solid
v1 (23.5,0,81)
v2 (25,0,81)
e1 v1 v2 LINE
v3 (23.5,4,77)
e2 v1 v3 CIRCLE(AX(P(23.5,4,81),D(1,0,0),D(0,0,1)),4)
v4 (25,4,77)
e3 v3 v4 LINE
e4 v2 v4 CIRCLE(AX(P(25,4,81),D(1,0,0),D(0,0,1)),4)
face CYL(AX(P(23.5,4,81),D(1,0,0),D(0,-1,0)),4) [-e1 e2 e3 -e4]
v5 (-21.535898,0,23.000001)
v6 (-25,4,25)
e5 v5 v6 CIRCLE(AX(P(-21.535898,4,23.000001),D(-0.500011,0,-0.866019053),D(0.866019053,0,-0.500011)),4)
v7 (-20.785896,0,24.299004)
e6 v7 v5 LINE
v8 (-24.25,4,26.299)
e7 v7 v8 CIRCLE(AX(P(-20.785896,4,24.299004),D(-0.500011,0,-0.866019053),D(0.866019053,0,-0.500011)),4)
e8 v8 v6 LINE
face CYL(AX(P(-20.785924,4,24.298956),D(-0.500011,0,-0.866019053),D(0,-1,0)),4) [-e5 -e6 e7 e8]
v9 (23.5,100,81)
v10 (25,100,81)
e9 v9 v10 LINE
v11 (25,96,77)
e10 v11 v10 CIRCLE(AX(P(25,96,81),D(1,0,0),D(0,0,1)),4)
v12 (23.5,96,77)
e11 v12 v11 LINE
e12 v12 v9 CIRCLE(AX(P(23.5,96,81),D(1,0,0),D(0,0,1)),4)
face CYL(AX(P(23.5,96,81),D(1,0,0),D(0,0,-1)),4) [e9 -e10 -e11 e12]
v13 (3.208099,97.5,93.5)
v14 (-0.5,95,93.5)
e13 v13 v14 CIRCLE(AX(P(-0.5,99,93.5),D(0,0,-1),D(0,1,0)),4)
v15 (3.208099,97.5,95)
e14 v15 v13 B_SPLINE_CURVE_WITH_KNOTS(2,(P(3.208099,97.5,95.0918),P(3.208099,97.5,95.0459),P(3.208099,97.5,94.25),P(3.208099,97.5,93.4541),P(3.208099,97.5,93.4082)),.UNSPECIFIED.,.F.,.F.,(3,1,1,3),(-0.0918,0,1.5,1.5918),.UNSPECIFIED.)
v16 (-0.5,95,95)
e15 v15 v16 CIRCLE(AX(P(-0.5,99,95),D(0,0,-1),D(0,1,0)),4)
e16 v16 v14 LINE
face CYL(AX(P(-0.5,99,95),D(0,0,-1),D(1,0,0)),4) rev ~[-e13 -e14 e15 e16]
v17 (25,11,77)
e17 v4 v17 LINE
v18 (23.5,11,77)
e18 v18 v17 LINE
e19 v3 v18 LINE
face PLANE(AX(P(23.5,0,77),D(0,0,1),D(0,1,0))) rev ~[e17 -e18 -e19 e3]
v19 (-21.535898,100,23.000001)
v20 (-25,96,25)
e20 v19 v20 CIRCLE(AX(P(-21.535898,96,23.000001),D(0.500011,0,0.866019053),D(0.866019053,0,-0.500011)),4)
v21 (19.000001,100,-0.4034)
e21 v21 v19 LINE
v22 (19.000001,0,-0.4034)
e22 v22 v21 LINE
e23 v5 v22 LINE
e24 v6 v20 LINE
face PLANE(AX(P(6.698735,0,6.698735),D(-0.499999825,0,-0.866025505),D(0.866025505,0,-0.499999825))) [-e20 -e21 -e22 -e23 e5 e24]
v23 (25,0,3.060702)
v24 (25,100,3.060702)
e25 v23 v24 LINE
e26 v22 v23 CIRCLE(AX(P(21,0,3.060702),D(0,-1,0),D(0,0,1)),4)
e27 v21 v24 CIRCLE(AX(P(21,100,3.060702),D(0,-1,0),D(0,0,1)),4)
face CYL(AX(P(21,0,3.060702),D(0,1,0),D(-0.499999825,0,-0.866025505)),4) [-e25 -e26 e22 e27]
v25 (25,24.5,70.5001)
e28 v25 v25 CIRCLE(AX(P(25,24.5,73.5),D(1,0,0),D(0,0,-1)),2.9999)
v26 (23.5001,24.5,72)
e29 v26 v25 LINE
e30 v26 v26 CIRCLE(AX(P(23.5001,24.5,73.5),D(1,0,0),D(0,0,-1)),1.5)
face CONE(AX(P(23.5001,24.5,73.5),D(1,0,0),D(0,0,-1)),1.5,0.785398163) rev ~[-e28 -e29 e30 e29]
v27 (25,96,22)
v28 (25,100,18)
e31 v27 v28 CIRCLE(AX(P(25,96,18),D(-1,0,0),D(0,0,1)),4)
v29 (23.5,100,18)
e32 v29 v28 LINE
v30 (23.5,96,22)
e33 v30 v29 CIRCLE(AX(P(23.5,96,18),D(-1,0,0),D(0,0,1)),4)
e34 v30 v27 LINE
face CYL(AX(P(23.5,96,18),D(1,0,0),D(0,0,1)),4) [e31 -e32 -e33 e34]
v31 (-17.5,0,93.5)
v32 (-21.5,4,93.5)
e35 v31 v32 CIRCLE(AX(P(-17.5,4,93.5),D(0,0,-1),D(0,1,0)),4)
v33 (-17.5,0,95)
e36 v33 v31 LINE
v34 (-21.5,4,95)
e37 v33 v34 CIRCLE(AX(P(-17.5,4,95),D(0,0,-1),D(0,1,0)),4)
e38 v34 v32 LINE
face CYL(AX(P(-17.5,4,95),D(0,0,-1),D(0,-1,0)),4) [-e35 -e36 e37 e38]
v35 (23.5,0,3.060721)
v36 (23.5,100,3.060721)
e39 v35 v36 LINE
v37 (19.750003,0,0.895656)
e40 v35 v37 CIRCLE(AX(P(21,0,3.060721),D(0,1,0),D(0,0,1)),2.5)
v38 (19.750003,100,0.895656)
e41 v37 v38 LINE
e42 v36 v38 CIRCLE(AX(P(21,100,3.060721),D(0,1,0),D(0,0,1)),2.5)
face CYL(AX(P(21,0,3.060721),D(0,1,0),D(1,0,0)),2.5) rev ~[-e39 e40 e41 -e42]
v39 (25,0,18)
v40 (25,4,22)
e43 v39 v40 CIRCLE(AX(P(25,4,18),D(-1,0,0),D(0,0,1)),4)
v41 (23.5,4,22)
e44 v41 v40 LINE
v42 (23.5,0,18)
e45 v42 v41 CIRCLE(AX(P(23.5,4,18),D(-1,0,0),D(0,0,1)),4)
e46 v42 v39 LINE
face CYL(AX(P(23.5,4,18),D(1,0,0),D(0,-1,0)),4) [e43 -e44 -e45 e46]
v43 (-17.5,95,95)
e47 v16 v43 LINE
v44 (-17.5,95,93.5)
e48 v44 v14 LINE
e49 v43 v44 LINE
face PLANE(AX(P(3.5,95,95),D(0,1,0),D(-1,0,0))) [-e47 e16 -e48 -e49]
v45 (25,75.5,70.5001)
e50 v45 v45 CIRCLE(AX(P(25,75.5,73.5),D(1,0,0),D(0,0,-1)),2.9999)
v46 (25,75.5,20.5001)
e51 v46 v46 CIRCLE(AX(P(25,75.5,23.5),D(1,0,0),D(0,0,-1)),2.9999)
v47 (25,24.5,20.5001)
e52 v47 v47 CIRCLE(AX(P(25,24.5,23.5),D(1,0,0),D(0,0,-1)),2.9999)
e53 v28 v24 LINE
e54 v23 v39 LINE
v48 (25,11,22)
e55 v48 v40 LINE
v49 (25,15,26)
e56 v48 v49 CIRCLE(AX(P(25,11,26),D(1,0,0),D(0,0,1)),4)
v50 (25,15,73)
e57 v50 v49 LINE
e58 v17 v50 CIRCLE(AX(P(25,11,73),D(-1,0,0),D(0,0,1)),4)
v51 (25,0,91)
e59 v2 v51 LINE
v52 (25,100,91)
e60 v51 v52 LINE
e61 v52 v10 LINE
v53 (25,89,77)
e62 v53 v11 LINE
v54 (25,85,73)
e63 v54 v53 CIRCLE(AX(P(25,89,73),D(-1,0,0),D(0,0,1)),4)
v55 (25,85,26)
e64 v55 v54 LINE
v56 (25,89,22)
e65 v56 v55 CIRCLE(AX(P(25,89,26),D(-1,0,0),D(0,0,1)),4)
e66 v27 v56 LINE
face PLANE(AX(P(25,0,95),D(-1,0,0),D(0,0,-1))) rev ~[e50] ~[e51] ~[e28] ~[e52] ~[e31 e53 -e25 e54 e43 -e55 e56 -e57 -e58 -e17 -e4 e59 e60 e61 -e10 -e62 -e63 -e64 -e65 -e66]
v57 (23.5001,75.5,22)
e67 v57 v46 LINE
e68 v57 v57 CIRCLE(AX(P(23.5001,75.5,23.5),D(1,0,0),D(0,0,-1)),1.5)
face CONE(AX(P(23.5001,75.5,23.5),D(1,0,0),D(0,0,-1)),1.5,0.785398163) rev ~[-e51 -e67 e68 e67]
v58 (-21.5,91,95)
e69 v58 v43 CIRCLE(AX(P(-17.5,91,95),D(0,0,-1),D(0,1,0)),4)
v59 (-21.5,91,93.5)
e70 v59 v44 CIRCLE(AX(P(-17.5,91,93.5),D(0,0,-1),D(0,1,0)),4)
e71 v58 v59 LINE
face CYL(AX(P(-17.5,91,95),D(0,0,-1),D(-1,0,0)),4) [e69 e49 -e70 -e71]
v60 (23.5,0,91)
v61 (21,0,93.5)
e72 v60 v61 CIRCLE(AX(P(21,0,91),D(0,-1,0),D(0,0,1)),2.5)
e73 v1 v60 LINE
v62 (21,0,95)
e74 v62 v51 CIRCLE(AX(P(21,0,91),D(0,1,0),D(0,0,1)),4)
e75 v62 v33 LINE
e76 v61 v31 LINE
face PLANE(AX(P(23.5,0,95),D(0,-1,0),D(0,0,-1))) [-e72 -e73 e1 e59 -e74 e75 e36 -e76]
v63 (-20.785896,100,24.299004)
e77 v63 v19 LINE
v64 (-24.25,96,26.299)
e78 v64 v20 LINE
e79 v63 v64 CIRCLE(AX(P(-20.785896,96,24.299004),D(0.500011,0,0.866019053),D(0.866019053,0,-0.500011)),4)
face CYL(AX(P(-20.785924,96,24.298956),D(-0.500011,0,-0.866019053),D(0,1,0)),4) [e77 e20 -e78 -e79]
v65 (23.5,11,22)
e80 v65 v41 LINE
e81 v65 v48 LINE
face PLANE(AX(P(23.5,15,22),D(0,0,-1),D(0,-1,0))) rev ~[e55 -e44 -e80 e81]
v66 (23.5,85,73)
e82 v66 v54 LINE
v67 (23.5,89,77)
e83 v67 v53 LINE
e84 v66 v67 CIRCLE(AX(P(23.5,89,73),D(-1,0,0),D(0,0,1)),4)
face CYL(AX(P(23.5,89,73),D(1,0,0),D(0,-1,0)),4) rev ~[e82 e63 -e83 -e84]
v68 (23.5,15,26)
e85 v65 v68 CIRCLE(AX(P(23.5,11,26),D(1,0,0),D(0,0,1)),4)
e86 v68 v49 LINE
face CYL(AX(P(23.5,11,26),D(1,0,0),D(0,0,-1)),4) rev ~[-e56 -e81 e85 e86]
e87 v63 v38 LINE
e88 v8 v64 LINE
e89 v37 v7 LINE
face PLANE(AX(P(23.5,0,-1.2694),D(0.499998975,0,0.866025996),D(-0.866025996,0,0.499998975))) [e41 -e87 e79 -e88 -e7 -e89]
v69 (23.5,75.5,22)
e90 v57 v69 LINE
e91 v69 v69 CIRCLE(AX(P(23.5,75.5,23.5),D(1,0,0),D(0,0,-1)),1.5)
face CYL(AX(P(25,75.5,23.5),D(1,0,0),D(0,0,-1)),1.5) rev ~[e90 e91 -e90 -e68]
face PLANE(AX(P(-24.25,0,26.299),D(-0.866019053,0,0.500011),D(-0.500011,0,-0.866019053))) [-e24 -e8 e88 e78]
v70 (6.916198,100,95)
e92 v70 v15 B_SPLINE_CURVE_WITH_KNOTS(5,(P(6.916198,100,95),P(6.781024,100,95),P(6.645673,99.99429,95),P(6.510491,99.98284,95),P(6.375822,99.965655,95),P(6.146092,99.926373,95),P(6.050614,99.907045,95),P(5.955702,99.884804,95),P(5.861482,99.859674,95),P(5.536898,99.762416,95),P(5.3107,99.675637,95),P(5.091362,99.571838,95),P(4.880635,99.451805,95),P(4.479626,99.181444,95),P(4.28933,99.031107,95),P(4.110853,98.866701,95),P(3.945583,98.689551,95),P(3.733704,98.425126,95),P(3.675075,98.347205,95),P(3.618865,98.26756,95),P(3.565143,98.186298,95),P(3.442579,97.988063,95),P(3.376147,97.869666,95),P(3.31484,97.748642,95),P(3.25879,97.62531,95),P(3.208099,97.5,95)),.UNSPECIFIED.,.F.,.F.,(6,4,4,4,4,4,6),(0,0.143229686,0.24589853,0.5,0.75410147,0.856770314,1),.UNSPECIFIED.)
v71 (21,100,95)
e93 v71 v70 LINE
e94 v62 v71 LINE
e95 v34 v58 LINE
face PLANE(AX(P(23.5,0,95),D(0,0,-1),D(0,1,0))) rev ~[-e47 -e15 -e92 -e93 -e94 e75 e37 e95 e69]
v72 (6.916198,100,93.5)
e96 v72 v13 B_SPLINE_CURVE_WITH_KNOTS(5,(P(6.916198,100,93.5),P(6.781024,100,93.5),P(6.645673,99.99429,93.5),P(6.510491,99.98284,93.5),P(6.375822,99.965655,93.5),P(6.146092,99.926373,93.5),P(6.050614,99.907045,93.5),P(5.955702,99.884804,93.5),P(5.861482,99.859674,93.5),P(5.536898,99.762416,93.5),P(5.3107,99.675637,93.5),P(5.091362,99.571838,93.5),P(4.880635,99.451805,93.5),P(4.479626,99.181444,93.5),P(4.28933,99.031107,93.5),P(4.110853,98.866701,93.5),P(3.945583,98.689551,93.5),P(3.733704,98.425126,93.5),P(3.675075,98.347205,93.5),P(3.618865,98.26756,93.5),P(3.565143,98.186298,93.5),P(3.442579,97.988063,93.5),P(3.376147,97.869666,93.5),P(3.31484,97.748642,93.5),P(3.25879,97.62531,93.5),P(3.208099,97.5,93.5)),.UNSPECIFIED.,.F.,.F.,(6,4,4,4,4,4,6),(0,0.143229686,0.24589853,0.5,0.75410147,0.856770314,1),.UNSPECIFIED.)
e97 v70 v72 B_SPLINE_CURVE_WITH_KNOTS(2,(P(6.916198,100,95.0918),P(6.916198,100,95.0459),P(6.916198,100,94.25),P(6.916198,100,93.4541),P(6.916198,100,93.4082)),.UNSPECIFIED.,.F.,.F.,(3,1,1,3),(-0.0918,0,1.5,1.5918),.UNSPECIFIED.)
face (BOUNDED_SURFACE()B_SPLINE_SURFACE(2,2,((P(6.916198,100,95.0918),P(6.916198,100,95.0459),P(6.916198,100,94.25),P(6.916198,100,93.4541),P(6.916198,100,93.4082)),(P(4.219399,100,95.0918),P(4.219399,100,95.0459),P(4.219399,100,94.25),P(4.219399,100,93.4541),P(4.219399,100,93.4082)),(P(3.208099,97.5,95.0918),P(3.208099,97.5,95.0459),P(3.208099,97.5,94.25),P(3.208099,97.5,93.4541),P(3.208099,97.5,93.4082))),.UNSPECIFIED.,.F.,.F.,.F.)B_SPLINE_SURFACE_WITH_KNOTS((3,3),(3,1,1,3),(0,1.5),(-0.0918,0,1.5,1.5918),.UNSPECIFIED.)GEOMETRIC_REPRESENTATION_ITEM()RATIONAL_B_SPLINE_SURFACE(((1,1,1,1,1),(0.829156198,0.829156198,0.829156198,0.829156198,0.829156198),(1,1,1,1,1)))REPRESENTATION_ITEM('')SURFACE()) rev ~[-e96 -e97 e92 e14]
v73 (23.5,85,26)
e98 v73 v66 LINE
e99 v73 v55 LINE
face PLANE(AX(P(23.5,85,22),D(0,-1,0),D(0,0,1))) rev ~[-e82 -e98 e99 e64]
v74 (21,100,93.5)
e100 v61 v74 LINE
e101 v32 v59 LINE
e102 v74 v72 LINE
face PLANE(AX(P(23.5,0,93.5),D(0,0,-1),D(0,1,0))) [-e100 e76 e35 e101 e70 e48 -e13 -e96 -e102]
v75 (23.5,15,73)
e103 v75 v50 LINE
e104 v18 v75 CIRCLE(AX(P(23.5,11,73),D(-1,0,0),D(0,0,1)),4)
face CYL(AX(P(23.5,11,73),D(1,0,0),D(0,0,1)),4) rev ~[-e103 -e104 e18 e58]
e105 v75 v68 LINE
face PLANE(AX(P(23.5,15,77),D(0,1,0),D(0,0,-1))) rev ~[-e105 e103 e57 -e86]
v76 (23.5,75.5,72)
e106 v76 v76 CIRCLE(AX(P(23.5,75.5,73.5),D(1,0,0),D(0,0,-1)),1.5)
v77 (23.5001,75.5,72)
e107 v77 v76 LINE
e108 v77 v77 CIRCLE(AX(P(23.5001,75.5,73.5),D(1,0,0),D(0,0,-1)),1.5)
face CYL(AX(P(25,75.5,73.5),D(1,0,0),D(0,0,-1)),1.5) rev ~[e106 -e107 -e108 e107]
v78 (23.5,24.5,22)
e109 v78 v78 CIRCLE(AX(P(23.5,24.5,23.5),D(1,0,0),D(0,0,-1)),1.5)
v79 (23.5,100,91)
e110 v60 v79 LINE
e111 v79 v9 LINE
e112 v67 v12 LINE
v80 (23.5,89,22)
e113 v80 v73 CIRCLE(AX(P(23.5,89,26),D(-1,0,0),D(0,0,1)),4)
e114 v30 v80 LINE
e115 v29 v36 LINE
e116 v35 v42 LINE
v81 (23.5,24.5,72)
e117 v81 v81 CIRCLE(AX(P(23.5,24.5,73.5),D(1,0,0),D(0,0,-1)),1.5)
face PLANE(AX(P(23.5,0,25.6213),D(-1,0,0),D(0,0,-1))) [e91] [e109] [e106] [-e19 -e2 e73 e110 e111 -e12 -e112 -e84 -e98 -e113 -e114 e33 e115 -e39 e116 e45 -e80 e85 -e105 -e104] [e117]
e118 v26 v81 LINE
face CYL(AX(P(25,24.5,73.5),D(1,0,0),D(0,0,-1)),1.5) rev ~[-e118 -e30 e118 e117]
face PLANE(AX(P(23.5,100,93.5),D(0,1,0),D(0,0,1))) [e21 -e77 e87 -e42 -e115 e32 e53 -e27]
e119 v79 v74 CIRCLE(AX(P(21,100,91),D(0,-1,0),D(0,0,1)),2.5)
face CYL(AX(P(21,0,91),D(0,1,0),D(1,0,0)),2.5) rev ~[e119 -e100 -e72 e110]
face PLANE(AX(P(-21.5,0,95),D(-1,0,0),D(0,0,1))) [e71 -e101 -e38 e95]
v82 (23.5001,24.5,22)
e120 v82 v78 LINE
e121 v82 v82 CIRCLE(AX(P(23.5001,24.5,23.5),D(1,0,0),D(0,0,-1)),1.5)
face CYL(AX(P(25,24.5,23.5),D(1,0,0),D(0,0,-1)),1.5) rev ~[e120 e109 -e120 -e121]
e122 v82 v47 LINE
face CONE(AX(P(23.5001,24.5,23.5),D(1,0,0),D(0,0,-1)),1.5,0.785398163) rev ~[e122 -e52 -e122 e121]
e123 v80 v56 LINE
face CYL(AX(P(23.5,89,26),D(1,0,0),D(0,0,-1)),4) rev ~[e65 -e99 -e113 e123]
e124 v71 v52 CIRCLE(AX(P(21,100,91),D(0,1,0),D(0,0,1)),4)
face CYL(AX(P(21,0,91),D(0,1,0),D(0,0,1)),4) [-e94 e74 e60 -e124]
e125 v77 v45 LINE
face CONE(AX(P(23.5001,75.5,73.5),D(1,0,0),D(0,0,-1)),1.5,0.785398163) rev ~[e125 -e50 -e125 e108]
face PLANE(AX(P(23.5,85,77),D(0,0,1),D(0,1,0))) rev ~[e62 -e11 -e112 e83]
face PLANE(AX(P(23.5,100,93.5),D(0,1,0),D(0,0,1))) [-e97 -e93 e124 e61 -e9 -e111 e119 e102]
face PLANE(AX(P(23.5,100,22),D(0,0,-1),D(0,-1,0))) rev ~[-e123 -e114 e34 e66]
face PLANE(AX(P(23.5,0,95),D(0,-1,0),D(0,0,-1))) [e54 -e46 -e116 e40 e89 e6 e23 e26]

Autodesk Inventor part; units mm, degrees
ref_plane "YZ Plane" through (0, 0, 0) normal (1, 0, 0) x (0, 1, 0)
ref_plane "XZ Plane" through (0, 0, 0) normal (0, 1, 0) x (-1, 0, 0)
ref_plane "XY Plane" through (0, 0, 0) normal (0, 0, 1) x (1, 0, 0)
sketch "Sketch2" plane through (0, 0, 0) normal (0, 1, 0) x (-1, 0, 0)
  line L0 (-23.5, 25.6213) -> (-23.5, 95)
  line L1 (-23.5, 95) -> (-25, 95)
  line L2 (-25, 95) -> (-25, 25)
  line L3 (-25, 25) -> (0, 0)
  line L4 (0, 0) -> (25, 25)
  line L5 (23.5, 25.6213) -> (0, 2.1213)
  line L6 (0, 2.1213) -> (-23.5, 25.6213)
  line L7 (23.5, 25.6213) -> (25, 25)
  line L8 (25, 25) -> (-25, -3.8675)
  line L9 (-25, -3.8675) -> (-25, 25)
  line L10 (-23.5, 25.6213) -> (-23.5, -1.2694)
  line L11 (-23.5, -1.2694) -> (24.25, 26.299)
  line L12 (24.25, 26.299) -> (25, 25)
  point P0 (24.5092, 24.5092)
  dimension "d11" = 1.5
  dimension "d18" = 1.5
  dimension "d19" = 1.5
  dimension "d27" = 70
  dimension "d28" = 50
  dimension "d29" = 135
  dimension "d47" = 60
  dimension "d48" = 1.5
extrude "Extrusion2" add sketch "Sketch2" along normal blind 100 contours L10 L3 L2 L1 L0 | L11 L12 L7 L5 L8 L6 | L6 L8 L3 L11 | L10 L11 L3 L8 L9 | L5 L7 L8
fillet "Fillet3" radius 2.5 1 edges at (23.5, 50, -1.2694)
sketch "Sketch7" plane through (23.5, 0, 95) normal (-1, 0, 0) x (0, 0, 1)
  line L0 (0, 0) -> (0, 100) projected
  line L1 (0, 0) -> (-1.5, 0)
  line L2 (-1.5, 0) -> (-1.5, 100)
  line L3 (-1.5, 100) -> (0, 100)
  line L4 (0, 100) -> (0, 0)
  line L5 (-91.9393, 100) -> (0, 100) projected
  point P0 (-95, 0)
  dimension "d49" = 1.5
extrude "Extrusion7" add sketch "Sketch7" along normal blind 45
fillet "Fillet12" radius 4 2 edges at (25, 50, 95) (25, 50, -3.8675)
fillet "Fillet13" radius 2.5 1 edges at (23.5, 50, 93.5)
sketch "Sketch8" plane through (23.5, 0, 3.0607) normal (-1, 0, 0) x (0, 0, 1)
  line L0 (18.9393, 0) -> (73.9393, 0)
  line L1 (73.9393, 0) -> (73.9393, 15)
  line L2 (73.9393, 15) -> (18.9393, 15)
  line L3 (18.9393, 15) -> (18.9393, 0)
  line L4 (18.9393, 85) -> (73.9393, 85)
  line L5 (73.9393, 85) -> (73.9393, 100)
  line L6 (73.9393, 100) -> (18.9393, 100)
  line L7 (18.9393, 100) -> (18.9393, 85)
  line L8 (0, 100) -> (87.9393, 100) projected
  line L9 (0, 0) -> (87.9393, 0) projected
  line L10 (91.9393, 0) -> (91.9393, 100) projected
  point P0 (-3.0607, 0)
  dimension "d54" = 15
  dimension "d55" = 55
  dimension "d58" = 18
extrude "Extrusion8" cut sketch "Sketch8" against normal through all
sketch "Sketch9" plane through (-21.5, 0, 95) normal (0, 0, 1) x (1, 0, 0)
  line L0 (0, 100) -> (0, 0) projected
  line L1 (0, 100) -> (25, 100)
  line L2 (25, 100) -> (25, 95)
  line L3 (25, 95) -> (0, 95)
  line L4 (0, 95) -> (0, 100)
  point P0 (21.5, 0)
  dimension "d60" = 5
  dimension "d61" = 25
extrude "Extrusion9" cut sketch "Sketch9" against normal blind 35
fillet "Fillet14" radius 4 14 edges at (24.25, 85, 77) (24.25, 85, 22) (24.25, 100, 22) (24.25, 100, 77) (24.25, 15, 22) (24.25, 0, 22) (24.25, 15, 77) (24.25, 0, 77) (-21.5, 95, 94.25) (3.5, 95, 94.25) (3.5, 100, 94.25) (-21.5, 0, 94.25) (-24.625, 0, 25.6495) (-24.625, 100, 25.6495)
sketch "Sketch10" plane through (25, 0, 3.0607) normal (1, 0, 0) x (0, 0, -1)
  circle A0 centre (-70.4393, 75.5) radius 1.5
  circle A1 centre (-20.4393, 75.5) radius 1.5
  circle A2 centre (-70.4393, 24.5) radius 1.5
  circle A3 centre (-20.4393, 24.5) radius 1.5
  line L0 (-91.9393, 100) -> (-91.9393, 0) projected
  line L1 (-91.9393, 4) -> (-91.9393, 91) projected
  line L2 (-87.9393, 100) -> (-77.9393, 100) projected
  point P0 (3.0607, 0)
  dimension "d64" = 3
  dimension "d65" = 50
  dimension "d66" = 51
  dimension "d70" = 24.5
  dimension "d71" = 21.5
extrude "Extrusion10" cut sketch "Sketch10" against normal blind 5
chamfer "Chamfer1" distance 1.5 angle 45 4 edges at (25, 75.5, 75) (25, 75.5, 25) (25, 24.5, 25) (25, 24.5, 75)
properties part number "armor"
